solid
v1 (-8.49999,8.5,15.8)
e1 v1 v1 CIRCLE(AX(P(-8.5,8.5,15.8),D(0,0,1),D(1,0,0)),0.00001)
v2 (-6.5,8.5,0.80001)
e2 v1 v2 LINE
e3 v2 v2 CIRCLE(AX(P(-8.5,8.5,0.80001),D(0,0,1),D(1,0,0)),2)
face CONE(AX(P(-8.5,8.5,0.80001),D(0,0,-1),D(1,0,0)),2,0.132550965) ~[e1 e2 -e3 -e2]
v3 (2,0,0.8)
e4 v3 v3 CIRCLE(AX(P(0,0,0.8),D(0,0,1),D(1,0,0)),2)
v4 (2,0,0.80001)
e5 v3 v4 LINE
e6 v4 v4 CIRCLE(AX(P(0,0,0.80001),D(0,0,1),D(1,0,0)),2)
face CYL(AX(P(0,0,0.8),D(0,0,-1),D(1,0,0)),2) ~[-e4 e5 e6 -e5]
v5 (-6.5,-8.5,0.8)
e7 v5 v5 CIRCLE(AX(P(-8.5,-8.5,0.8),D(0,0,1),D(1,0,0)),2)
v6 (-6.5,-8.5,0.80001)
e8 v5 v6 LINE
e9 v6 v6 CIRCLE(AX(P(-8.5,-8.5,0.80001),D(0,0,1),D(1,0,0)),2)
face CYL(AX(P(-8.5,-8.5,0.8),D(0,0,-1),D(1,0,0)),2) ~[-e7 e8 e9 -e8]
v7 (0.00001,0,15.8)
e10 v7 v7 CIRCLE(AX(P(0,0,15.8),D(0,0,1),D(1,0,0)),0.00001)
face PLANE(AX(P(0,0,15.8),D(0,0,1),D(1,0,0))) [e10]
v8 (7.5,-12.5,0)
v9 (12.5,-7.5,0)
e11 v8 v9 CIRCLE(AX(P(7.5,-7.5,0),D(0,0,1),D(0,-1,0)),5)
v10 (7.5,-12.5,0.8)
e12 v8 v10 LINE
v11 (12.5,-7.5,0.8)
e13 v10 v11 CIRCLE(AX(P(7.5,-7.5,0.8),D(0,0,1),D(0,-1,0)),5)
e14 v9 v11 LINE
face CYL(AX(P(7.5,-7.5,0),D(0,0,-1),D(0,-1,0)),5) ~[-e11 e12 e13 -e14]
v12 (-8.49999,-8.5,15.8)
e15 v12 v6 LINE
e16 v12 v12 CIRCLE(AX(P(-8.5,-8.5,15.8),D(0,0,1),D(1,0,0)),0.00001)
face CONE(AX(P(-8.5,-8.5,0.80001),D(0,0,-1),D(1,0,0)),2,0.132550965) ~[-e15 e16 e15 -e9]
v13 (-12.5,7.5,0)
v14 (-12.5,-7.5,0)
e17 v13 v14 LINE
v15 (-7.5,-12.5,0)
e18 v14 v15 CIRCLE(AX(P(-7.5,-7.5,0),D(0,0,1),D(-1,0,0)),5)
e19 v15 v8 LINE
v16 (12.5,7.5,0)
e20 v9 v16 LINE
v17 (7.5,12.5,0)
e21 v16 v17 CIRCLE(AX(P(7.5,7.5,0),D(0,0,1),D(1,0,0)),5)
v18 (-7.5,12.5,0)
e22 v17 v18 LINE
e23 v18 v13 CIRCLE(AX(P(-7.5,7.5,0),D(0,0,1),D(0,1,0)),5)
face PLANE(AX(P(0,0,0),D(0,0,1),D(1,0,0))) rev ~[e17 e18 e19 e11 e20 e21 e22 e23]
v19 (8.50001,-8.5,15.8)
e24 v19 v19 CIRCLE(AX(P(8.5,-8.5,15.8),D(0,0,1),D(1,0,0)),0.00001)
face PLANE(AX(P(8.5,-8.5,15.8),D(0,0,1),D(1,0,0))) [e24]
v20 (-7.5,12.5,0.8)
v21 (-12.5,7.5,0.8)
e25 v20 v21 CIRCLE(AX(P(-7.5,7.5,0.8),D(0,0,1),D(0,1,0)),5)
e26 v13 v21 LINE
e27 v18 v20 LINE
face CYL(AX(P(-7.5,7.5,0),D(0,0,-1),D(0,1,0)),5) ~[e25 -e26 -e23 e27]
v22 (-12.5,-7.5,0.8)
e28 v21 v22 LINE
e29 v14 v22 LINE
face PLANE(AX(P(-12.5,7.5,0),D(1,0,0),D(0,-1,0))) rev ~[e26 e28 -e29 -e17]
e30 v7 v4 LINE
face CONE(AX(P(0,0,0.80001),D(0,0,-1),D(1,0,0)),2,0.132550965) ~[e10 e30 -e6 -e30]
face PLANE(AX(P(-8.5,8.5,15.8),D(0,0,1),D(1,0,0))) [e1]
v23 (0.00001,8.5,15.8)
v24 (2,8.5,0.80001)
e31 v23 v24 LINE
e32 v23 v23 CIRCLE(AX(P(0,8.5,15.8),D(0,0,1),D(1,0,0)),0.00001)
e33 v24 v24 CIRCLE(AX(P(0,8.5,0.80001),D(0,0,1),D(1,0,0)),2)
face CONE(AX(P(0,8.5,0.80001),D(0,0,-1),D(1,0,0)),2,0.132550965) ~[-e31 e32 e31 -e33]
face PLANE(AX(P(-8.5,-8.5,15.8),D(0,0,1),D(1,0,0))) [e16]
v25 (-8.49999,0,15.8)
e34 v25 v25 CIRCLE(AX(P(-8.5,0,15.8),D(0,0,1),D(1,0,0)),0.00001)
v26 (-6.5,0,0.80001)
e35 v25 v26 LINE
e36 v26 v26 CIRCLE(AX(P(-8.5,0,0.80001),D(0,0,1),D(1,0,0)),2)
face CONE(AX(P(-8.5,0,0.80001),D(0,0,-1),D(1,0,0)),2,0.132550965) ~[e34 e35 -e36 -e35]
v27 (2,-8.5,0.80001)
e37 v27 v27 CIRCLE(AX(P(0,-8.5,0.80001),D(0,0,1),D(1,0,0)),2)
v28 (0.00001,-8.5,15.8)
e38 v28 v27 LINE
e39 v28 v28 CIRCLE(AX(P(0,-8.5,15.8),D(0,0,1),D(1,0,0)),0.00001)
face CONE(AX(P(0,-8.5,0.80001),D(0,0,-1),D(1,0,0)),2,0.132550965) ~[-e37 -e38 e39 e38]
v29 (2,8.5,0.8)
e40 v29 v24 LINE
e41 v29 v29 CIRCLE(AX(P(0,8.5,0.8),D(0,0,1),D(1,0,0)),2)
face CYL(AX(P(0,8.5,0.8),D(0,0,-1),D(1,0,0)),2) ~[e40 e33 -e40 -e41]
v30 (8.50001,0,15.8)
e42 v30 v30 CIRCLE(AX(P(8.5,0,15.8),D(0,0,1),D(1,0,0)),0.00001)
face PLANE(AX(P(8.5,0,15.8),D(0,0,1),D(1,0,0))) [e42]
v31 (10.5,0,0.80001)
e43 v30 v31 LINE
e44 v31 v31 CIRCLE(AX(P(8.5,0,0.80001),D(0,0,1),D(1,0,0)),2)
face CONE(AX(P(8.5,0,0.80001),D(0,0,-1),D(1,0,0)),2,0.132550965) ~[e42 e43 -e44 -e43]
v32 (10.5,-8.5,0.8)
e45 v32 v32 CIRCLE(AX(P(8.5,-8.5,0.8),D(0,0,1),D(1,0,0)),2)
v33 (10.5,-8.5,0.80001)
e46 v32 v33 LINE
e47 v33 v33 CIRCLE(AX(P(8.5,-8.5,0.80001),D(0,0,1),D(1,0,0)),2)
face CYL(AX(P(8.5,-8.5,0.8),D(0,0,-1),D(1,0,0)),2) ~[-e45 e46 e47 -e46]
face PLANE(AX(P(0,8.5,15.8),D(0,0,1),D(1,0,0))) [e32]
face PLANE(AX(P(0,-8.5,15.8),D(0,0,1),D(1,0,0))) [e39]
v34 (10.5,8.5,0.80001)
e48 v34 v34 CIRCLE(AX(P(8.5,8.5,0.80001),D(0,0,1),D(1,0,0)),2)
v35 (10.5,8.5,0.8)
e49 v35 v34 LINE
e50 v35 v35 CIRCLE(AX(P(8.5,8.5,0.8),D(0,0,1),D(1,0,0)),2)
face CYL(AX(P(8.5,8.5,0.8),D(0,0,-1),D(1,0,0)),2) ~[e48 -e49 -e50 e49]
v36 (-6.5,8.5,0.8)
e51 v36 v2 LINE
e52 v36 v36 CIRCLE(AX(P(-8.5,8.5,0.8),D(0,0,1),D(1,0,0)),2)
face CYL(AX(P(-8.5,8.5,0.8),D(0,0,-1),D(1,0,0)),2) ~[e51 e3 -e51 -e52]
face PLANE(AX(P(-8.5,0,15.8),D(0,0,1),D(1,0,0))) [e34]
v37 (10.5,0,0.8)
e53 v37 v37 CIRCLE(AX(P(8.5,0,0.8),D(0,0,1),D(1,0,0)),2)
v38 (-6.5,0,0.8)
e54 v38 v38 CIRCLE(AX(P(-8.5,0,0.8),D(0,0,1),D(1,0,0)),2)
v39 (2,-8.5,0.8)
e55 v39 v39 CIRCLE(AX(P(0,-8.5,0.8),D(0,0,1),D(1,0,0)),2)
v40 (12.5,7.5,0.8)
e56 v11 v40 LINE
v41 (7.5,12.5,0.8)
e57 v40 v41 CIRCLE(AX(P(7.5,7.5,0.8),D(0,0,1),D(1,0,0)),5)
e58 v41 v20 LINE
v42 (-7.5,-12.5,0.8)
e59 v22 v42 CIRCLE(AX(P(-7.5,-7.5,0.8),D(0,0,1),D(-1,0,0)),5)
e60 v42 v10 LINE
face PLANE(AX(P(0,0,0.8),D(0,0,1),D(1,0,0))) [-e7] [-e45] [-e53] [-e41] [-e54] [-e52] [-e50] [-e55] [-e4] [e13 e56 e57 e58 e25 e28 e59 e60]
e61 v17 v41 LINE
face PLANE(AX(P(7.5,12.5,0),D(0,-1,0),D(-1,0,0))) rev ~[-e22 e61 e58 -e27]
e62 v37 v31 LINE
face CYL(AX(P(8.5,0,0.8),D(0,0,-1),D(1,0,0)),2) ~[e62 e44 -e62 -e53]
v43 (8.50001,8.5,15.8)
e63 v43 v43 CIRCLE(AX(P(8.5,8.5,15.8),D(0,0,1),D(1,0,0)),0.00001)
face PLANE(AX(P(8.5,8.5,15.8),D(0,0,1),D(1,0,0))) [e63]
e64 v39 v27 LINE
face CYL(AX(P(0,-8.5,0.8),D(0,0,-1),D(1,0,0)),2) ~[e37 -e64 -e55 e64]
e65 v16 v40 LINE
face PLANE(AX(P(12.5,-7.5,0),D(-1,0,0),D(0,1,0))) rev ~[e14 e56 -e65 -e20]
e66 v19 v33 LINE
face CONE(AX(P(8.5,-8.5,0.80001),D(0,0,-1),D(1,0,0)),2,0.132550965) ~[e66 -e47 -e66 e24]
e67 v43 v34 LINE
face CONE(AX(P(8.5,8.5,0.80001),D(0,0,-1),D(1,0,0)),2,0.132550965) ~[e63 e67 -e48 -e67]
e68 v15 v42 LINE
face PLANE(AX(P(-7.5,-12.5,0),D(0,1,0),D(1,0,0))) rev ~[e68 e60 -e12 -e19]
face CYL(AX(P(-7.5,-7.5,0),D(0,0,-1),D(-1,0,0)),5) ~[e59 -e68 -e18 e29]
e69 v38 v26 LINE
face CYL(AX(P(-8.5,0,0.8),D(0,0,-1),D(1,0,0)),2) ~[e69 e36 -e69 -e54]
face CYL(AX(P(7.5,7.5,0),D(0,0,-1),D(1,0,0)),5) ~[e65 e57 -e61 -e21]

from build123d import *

# Parameters (mm, degrees)
F1_DEPTH   = 0.8
F2_R       = 2
F3_DEPTH   = 15
F4_SIZE2   = 14.99999
F4_SIZE    = 1.99999
F4_2_SIZE2 = 14.99999
F4_2_SIZE  = 1.99999
F4_3_SIZE2 = 14.99999
F4_3_SIZE  = 1.99999
F4_4_SIZE2 = 14.99999
F4_4_SIZE  = 1.99999
F4_5_SIZE2 = 14.99999
F4_5_SIZE  = 1.99999
F4_6_SIZE2 = 14.99999
F4_6_SIZE  = 1.99999
F4_7_SIZE2 = 14.99999
F4_7_SIZE  = 1.99999
F4_8_SIZE2 = 14.99999
F4_8_SIZE  = 1.99999
F4_9_SIZE2 = 14.99999
F4_9_SIZE  = 1.99999


# Not quite as in the source:
# - a fillet or chamfer is up to 0.001 mm smaller than in the source, because OpenCascade refuses the exact size


with BuildPart() as f1:
    # F0 (on Top) → F1 (new body)
    with BuildSketch(Plane.XY):
        with BuildLine():
            ThreePointArc((-12.5, -7.5), (-11.0355339059, -11.0355339059), (-7.5, -12.5))
            Line((-7.5, -12.5), (7.5, -12.5))
            ThreePointArc((7.5, -12.5), (11.0355339059, -11.0355339059), (12.5, -7.5))
            Line((12.5, -7.5), (12.5, 7.5))
            ThreePointArc((12.5, 7.5), (11.0355339059, 11.0355339059), (7.5, 12.5))
            Line((7.5, 12.5), (-7.5, 12.5))
            ThreePointArc((-7.5, 12.5), (-11.0355339059, 11.0355339059), (-12.5, 7.5))
            Line((-12.5, 7.5), (-12.5, -7.5))
        make_face()
    extrude(amount=F1_DEPTH)

    # F2 (on face) → F3 (join)
    with BuildSketch(Plane.XY.offset(0.8)):
        with Locations((-8.5, -8.5)):
            Circle(F2_R)
        with Locations((-8.5, 0)):
            Circle(F2_R)
        with Locations((-8.5, 8.5)):
            Circle(F2_R)
        with Locations((0, -8.5)):
            Circle(F2_R)
        Circle(F2_R)
        with Locations((0, 8.5)):
            Circle(F2_R)
        with Locations((8.5, -8.5)):
            Circle(F2_R)
        with Locations((8.5, 0)):
            Circle(F2_R)
        with Locations((8.5, 8.5)):
            Circle(F2_R)
    extrude(amount=F3_DEPTH)

    # F4 (size 2 and 15 in the source; OpenCascade refuses exactly that, so slightly less here)
    f4_edges = [f1.edges().sort_by_distance(p)[0] for p in [
        (-10.5, -8.5, 15.8),
    ]]
    f4_side = f1.faces().sort_by_distance((-8.5, -8.5, 15.8))[0]
    chamfer(f4_edges, length=F4_SIZE, length2=F4_SIZE2, reference=f4_side)

    # F4#2 (size 2 and 15 in the source; OpenCascade refuses exactly that, so slightly less here)
    f4_2_edges = [f1.edges().sort_by_distance(p)[0] for p in [
        (-10.5, 0, 15.8),
    ]]
    f4_2_side = f1.faces().sort_by_distance((-8.5, 0, 15.8))[0]
    chamfer(f4_2_edges, length=F4_2_SIZE, length2=F4_2_SIZE2, reference=f4_2_side)

    # F4#3 (size 2 and 15 in the source; OpenCascade refuses exactly that, so slightly less here)
    f4_3_edges = [f1.edges().sort_by_distance(p)[0] for p in [
        (-10.5, 8.5, 15.8),
    ]]
    f4_3_side = f1.faces().sort_by_distance((-8.5, 8.5, 15.8))[0]
    chamfer(f4_3_edges, length=F4_3_SIZE, length2=F4_3_SIZE2, reference=f4_3_side)

    # F4#4 (size 2 and 15 in the source; OpenCascade refuses exactly that, so slightly less here)
    f4_4_edges = [f1.edges().sort_by_distance(p)[0] for p in [
        (-2, 8.5, 15.8),
    ]]
    f4_4_side = f1.faces().sort_by_distance((0, 8.5, 15.8))[0]
    chamfer(f4_4_edges, length=F4_4_SIZE, length2=F4_4_SIZE2, reference=f4_4_side)

    # F4#5 (size 2 and 15 in the source; OpenCascade refuses exactly that, so slightly less here)
    f4_5_edges = [f1.edges().sort_by_distance(p)[0] for p in [
        (-2, 0, 15.8),
    ]]
    f4_5_side = f1.faces().sort_by_distance((0, 0, 15.8))[0]
    chamfer(f4_5_edges, length=F4_5_SIZE, length2=F4_5_SIZE2, reference=f4_5_side)

    # F4#6 (size 2 and 15 in the source; OpenCascade refuses exactly that, so slightly less here)
    f4_6_edges = [f1.edges().sort_by_distance(p)[0] for p in [
        (-2, -8.5, 15.8),
    ]]
    f4_6_side = f1.faces().sort_by_distance((0, -8.5, 15.8))[0]
    chamfer(f4_6_edges, length=F4_6_SIZE, length2=F4_6_SIZE2, reference=f4_6_side)

    # F4#7 (size 2 and 15 in the source; OpenCascade refuses exactly that, so slightly less here)
    f4_7_edges = [f1.edges().sort_by_distance(p)[0] for p in [
        (6.5, -8.5, 15.8),
    ]]
    f4_7_side = f1.faces().sort_by_distance((8.5, -8.5, 15.8))[0]
    chamfer(f4_7_edges, length=F4_7_SIZE, length2=F4_7_SIZE2, reference=f4_7_side)

    # F4#8 (size 2 and 15 in the source; OpenCascade refuses exactly that, so slightly less here)
    f4_8_edges = [f1.edges().sort_by_distance(p)[0] for p in [
        (6.5, 0, 15.8),
    ]]
    f4_8_side = f1.faces().sort_by_distance((8.5, 0, 15.8))[0]
    chamfer(f4_8_edges, length=F4_8_SIZE, length2=F4_8_SIZE2, reference=f4_8_side)

    # F4#9 (size 2 and 15 in the source; OpenCascade refuses exactly that, so slightly less here)
    f4_9_edges = [f1.edges().sort_by_distance(p)[0] for p in [
        (6.5, 8.5, 15.8),
    ]]
    f4_9_side = f1.faces().sort_by_distance((8.5, 8.5, 15.8))[0]
    chamfer(f4_9_edges, length=F4_9_SIZE, length2=F4_9_SIZE2, reference=f4_9_side)


solid = f1.part
